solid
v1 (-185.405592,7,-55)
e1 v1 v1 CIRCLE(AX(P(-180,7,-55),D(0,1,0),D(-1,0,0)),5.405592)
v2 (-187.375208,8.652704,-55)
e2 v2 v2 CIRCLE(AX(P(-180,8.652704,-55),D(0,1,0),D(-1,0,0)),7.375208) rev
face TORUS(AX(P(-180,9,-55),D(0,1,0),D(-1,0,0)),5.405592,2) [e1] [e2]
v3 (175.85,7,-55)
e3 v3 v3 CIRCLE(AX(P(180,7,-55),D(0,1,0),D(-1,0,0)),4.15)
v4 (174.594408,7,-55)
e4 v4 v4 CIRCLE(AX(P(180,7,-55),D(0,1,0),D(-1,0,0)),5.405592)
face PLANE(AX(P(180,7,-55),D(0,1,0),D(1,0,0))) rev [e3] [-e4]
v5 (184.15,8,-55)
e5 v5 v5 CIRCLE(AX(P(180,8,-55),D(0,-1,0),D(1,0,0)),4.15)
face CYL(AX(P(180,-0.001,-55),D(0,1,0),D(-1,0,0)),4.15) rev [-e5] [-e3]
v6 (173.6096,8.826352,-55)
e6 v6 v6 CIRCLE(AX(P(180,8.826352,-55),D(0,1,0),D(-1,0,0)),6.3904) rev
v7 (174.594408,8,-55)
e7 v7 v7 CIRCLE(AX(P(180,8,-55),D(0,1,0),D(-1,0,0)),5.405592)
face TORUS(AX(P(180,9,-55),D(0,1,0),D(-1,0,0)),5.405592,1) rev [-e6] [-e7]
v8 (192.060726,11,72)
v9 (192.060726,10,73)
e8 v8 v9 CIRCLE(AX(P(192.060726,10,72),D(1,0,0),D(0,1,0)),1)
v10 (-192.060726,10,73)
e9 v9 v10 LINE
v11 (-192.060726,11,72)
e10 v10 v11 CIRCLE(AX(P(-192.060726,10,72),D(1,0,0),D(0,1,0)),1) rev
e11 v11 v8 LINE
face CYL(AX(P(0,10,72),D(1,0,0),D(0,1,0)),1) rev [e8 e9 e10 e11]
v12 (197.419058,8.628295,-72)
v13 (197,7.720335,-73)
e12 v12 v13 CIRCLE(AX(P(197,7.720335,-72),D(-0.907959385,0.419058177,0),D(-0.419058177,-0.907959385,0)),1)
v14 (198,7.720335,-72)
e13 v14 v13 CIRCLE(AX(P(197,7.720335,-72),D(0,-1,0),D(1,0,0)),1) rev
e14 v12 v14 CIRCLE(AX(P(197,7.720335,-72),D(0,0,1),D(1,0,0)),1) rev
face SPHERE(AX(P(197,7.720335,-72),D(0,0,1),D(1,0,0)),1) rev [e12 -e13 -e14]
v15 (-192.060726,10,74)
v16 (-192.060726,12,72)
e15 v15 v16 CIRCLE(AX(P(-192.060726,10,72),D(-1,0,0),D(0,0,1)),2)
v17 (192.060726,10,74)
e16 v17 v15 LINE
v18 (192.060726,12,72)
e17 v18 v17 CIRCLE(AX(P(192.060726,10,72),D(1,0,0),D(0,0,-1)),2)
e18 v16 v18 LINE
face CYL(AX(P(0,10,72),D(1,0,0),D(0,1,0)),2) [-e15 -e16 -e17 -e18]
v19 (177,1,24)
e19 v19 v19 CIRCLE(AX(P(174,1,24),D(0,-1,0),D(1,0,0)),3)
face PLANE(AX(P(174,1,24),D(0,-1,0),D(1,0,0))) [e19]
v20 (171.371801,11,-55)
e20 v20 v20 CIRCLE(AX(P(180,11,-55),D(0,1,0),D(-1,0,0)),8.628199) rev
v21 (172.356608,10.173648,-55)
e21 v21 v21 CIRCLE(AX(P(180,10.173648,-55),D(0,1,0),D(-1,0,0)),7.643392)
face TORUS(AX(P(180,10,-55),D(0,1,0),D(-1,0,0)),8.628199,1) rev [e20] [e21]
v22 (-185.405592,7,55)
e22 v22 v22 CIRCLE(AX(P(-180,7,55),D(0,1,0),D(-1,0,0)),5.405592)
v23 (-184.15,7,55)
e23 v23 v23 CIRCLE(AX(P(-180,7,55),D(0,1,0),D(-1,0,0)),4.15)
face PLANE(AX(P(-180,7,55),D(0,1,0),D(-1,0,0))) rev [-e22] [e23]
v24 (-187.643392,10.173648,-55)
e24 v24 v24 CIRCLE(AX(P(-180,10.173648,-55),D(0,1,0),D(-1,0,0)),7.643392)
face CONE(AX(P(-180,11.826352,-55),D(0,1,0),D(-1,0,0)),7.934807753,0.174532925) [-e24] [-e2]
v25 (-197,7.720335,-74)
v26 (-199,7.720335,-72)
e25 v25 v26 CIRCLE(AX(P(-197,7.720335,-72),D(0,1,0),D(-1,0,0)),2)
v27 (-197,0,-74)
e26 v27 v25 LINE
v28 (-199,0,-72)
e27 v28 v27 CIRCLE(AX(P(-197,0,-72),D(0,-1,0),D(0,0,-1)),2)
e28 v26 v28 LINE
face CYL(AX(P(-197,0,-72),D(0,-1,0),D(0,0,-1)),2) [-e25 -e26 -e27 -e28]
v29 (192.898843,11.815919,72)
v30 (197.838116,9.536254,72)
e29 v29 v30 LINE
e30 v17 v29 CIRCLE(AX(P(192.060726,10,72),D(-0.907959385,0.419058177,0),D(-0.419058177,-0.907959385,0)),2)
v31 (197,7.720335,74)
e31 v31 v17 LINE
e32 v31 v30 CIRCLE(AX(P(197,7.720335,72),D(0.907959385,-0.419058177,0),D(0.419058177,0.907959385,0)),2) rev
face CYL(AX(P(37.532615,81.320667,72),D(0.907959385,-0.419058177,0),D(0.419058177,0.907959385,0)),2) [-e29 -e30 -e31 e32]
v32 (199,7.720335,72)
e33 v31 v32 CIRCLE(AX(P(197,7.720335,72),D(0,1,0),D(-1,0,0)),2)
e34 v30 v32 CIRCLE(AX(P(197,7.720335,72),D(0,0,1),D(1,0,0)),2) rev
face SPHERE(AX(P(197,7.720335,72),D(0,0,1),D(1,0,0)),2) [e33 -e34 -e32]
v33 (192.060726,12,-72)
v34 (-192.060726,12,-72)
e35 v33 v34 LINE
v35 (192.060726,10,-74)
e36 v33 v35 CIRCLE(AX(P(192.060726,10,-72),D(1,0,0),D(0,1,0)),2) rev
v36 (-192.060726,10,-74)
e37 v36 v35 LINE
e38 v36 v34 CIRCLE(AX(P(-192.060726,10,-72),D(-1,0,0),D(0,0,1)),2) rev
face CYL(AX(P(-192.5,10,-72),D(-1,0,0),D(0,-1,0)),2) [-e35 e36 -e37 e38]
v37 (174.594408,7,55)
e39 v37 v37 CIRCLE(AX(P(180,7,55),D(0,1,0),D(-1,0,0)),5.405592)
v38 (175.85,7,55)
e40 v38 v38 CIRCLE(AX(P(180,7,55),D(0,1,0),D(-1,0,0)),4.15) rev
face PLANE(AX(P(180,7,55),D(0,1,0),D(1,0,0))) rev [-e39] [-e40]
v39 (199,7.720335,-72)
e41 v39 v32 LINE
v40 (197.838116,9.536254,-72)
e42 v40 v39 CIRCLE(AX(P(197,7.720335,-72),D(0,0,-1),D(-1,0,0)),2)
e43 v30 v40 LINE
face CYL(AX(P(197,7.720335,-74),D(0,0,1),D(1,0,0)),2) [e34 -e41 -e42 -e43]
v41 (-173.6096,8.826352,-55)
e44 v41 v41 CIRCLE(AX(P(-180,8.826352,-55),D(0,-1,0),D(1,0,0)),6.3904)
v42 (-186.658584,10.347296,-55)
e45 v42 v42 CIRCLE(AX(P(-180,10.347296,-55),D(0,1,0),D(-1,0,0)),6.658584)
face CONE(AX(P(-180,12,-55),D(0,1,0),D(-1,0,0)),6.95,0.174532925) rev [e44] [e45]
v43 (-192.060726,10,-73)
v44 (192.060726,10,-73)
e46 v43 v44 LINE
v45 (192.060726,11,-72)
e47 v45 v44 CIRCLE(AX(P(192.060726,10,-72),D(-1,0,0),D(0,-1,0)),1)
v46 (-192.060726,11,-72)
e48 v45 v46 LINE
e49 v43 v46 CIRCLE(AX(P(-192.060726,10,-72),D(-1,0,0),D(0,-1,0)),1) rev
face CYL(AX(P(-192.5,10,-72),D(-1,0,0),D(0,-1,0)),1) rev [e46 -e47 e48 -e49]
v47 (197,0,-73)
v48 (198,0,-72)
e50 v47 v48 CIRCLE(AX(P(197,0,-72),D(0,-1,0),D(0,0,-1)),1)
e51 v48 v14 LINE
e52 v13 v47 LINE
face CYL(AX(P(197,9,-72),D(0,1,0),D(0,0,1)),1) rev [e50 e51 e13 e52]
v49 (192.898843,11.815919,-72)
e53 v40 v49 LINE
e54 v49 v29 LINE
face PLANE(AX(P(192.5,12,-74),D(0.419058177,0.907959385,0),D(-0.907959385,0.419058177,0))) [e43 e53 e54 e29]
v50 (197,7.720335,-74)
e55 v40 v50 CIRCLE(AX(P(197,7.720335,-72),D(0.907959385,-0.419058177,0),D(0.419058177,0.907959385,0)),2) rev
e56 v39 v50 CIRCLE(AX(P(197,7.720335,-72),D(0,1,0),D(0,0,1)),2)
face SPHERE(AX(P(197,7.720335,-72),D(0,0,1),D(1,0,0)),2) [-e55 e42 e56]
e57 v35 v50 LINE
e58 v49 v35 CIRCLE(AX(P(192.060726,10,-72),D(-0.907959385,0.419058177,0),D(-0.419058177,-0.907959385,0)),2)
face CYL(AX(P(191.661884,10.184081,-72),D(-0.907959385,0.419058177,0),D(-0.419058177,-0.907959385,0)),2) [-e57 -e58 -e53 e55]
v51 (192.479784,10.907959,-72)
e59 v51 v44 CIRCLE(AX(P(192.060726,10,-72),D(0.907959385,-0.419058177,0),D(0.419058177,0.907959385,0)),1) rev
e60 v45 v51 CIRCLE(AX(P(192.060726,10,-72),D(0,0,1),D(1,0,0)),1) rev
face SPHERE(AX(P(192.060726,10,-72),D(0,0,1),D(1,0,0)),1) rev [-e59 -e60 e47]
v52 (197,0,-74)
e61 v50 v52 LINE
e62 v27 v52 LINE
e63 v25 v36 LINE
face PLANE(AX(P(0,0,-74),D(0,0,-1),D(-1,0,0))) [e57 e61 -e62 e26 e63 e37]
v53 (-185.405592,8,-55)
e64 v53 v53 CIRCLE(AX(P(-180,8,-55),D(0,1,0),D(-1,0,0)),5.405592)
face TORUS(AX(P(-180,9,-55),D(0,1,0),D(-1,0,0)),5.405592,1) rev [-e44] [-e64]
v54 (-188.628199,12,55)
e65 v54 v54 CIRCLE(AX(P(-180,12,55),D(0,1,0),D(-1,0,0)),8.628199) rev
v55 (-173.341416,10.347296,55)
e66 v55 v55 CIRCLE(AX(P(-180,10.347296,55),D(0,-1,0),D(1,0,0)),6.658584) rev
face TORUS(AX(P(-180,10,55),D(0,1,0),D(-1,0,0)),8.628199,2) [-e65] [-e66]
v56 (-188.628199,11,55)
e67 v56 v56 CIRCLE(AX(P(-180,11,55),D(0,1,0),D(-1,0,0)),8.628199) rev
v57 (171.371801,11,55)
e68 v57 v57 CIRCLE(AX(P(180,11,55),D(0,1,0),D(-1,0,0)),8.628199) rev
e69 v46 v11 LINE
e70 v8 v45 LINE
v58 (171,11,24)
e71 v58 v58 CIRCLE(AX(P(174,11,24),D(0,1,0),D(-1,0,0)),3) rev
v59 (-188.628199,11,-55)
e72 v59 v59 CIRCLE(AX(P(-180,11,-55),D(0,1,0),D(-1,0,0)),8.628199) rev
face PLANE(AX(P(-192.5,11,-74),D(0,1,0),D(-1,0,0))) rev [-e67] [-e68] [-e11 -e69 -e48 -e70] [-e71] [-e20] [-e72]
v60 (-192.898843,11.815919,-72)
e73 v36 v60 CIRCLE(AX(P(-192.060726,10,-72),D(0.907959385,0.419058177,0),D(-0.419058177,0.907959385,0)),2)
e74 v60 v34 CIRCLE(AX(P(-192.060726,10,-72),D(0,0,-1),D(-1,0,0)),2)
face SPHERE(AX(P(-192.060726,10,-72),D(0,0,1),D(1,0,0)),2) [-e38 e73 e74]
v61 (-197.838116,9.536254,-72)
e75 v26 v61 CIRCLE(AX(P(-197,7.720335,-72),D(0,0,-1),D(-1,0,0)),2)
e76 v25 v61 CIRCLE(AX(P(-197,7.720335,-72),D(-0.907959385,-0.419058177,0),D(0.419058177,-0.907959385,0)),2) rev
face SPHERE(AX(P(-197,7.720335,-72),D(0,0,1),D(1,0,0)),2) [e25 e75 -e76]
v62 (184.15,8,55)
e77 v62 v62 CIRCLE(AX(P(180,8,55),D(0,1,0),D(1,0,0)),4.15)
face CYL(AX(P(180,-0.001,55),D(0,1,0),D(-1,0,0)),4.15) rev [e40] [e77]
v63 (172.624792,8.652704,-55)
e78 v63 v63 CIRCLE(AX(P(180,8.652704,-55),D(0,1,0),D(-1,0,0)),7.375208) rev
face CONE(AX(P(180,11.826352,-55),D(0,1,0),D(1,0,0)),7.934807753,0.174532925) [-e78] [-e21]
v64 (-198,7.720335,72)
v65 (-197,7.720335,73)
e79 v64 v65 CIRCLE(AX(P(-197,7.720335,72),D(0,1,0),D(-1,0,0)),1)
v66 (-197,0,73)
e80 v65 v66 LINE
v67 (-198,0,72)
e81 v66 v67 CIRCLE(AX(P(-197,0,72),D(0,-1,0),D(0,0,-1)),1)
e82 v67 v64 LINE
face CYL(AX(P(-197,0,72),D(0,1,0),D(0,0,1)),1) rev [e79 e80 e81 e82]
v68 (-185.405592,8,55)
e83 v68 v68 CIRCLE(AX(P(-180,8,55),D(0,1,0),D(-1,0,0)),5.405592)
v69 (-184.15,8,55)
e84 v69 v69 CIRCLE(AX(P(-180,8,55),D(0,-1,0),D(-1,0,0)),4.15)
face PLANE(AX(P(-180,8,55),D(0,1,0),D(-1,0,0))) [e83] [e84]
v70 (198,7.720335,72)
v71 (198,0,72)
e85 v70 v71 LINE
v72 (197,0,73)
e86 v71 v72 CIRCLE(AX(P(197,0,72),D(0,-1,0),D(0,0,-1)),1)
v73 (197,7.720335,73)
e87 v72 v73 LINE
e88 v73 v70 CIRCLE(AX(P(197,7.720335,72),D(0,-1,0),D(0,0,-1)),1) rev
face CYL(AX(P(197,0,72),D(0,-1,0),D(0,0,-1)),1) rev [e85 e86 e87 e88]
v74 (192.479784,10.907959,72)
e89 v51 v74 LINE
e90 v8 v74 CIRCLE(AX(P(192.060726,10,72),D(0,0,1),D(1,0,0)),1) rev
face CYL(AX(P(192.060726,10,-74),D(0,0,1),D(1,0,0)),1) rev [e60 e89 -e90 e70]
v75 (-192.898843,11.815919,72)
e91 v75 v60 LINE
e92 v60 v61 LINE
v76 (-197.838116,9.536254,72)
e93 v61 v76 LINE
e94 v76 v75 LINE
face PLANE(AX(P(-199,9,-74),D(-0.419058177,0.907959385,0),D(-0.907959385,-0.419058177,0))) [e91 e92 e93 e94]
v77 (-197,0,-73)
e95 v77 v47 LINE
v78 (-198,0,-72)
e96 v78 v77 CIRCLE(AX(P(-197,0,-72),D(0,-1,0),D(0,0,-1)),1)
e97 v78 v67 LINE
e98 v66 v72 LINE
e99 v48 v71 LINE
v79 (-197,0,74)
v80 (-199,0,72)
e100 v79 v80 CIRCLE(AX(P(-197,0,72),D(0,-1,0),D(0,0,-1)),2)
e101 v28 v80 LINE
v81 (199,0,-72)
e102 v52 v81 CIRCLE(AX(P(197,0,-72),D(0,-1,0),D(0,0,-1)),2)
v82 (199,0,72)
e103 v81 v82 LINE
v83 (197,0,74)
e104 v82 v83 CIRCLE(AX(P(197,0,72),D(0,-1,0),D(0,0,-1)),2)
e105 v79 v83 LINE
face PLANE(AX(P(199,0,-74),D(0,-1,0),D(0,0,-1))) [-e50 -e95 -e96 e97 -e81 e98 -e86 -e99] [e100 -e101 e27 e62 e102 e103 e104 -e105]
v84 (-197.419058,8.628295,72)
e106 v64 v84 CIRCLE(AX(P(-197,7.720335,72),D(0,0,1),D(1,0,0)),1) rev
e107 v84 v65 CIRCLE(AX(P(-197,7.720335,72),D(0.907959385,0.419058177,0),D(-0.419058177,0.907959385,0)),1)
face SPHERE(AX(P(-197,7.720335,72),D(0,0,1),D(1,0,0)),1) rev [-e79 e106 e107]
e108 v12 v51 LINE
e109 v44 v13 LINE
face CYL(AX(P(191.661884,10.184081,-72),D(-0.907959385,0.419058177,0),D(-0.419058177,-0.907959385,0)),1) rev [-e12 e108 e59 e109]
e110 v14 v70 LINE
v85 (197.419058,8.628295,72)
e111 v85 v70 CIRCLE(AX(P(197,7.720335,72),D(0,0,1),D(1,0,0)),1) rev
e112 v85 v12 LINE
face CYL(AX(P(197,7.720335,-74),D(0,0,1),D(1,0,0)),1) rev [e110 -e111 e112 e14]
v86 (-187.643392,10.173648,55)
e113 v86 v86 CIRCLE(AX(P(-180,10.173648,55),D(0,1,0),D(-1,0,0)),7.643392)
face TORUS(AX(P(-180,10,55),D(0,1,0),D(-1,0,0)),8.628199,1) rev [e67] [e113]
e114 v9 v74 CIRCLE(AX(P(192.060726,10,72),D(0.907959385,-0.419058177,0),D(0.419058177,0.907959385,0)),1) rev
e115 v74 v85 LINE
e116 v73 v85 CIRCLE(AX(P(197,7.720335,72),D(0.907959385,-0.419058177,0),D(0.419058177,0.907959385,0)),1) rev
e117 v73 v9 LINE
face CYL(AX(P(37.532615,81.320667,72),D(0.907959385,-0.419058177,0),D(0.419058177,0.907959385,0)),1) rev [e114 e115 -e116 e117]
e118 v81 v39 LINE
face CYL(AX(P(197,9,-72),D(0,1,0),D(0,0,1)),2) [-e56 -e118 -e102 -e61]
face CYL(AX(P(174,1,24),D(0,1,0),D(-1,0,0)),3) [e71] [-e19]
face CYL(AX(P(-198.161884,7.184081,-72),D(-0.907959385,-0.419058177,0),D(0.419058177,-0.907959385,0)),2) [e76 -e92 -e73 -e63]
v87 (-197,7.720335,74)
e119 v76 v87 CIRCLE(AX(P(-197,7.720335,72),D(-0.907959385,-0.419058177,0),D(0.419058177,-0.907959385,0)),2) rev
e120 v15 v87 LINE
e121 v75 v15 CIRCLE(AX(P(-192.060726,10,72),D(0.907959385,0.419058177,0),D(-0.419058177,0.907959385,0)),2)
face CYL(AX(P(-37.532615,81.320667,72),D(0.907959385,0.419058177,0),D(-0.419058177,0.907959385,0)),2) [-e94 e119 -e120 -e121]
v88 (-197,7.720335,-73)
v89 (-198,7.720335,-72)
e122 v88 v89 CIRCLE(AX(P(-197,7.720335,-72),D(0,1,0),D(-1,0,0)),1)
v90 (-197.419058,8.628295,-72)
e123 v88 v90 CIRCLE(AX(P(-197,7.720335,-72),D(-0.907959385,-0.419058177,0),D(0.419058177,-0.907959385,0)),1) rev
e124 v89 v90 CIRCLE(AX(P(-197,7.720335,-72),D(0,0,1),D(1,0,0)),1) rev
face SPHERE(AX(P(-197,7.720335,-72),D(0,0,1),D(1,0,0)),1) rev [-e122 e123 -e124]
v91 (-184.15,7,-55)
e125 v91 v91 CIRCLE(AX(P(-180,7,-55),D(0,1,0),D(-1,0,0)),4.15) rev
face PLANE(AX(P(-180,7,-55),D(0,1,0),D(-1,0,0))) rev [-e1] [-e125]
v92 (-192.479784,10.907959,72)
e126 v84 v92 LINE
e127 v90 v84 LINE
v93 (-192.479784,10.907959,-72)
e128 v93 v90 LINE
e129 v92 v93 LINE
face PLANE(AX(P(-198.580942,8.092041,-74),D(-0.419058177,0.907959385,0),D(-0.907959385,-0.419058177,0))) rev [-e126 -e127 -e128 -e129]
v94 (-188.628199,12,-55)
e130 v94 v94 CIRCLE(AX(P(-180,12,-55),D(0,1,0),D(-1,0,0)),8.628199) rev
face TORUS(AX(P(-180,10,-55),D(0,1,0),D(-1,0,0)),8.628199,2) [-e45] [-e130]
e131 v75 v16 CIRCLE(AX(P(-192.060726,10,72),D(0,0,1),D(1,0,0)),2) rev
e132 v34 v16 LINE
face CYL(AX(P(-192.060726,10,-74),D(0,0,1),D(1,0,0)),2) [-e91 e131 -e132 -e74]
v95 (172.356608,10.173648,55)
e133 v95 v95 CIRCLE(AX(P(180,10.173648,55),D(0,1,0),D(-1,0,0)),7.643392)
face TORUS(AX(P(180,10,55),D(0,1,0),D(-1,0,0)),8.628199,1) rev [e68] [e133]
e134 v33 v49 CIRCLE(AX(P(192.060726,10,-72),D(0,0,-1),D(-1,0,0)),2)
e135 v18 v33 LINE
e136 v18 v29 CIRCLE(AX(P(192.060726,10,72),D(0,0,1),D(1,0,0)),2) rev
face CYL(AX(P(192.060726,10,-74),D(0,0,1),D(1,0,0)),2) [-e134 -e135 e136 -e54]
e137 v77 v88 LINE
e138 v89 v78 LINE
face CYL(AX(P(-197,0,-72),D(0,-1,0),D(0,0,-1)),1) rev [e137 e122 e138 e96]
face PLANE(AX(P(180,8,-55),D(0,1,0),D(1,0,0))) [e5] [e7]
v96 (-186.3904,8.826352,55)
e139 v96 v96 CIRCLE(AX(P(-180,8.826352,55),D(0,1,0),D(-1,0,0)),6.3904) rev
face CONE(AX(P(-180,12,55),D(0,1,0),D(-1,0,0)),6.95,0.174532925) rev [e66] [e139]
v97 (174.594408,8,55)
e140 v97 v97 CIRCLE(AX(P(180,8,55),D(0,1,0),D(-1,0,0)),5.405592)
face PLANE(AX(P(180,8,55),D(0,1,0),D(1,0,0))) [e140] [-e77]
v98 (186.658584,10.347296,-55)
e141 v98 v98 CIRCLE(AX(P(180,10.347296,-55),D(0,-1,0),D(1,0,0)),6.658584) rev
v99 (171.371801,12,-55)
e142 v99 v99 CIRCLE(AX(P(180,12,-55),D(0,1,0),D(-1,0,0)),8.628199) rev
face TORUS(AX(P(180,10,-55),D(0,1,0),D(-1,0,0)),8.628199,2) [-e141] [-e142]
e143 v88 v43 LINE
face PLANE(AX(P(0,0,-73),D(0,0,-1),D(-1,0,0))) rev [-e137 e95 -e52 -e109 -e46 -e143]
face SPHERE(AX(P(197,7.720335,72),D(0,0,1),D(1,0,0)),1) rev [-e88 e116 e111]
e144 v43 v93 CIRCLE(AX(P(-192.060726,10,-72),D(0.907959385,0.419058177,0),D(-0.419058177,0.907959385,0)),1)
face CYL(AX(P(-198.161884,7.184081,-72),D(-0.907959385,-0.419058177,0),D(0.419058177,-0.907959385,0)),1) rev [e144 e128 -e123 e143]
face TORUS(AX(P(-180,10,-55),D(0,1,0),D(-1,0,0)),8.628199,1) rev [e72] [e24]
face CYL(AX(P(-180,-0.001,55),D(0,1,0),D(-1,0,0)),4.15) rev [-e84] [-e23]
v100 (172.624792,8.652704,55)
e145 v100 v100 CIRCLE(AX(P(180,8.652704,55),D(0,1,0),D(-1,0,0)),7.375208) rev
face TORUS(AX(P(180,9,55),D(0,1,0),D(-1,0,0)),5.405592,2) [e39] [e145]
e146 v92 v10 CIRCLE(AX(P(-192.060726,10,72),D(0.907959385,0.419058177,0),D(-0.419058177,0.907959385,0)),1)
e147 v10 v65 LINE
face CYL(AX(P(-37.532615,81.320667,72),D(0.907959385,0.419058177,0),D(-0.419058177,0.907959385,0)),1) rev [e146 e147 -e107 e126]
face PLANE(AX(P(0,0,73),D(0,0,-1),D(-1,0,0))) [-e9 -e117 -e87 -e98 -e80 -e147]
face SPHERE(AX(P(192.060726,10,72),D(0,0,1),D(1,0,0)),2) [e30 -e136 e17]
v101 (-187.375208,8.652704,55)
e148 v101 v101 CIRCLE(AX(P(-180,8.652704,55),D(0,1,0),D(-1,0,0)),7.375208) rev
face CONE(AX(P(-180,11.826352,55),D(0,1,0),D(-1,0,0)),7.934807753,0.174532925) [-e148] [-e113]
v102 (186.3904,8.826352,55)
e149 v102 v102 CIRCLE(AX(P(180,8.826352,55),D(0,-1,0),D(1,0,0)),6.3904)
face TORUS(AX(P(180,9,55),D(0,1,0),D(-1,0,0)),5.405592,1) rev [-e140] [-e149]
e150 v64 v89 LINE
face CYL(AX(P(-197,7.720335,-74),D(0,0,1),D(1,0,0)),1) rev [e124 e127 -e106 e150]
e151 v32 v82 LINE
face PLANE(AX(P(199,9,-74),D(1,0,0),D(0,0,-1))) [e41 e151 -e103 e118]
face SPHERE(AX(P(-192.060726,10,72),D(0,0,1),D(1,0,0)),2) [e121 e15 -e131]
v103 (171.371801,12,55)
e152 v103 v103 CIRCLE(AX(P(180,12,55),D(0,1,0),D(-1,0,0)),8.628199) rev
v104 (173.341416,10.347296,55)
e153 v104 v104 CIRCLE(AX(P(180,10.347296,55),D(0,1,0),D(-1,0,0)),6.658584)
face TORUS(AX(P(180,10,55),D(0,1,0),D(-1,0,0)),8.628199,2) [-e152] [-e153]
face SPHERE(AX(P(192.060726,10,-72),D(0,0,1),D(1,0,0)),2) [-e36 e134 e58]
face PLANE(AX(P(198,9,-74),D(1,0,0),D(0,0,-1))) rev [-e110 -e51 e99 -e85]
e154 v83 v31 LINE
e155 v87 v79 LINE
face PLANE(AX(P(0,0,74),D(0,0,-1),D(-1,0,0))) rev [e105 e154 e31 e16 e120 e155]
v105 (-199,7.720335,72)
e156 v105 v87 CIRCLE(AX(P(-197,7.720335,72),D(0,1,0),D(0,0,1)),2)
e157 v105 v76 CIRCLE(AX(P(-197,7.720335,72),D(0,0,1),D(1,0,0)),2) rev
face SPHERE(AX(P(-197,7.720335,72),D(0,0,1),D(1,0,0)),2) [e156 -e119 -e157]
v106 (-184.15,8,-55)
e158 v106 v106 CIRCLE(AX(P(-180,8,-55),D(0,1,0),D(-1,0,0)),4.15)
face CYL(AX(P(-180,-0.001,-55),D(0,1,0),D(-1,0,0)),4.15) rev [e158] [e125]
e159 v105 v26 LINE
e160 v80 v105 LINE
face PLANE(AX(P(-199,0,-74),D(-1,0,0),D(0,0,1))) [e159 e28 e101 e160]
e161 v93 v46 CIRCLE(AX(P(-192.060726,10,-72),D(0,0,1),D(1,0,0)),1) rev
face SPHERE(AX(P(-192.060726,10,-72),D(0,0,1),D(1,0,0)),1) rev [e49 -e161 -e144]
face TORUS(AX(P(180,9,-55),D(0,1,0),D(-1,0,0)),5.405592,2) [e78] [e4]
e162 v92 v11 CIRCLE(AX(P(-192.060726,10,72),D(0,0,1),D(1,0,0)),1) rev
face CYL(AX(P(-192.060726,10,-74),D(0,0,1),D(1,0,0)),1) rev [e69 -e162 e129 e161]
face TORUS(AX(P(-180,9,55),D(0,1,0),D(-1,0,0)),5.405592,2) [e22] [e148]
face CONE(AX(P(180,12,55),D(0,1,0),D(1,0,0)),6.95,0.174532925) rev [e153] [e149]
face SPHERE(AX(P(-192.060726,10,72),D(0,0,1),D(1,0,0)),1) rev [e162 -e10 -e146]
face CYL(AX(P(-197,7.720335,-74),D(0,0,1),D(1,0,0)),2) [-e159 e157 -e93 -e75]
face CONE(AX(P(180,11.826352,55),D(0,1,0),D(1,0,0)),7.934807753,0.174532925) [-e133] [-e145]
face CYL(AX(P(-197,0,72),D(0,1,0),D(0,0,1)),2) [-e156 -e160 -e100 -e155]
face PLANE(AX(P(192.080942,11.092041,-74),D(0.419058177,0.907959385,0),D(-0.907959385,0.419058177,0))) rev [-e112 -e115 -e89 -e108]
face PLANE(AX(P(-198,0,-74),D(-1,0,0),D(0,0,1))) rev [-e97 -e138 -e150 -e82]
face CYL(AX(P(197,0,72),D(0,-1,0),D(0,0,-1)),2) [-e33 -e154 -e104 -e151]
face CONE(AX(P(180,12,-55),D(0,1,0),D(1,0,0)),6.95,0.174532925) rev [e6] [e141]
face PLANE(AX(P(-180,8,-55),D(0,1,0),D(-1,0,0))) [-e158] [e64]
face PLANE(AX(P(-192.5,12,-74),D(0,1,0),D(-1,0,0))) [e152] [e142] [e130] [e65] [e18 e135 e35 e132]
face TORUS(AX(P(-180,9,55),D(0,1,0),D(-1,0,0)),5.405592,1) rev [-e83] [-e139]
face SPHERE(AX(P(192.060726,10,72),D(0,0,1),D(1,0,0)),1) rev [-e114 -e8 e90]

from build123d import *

# Parameters (mm, degrees)
BOSS_EXTRUDE1_DEPTH       = 74
BOSS_EXTRUDE1_DEPTH_BACK  = 74
SKETCH2_R                 = 6.95
CUT_EXTRUDE1_DEPTH        = 4
DRAFT1_ANGLE              = 10
FILLET2_R                 = 1
DRAFT1_OF_MIRROR1_2_ANGLE = 10
FILLET2_OF_MIRROR1_R      = 1
FILLET1_R                 = 2
SHELL1_T                  = -1
CUT_EXTRUDE2_REACH        = 214.464
SKETCH3_R                 = 4.15
MIRROR4_COPY_1_REACH      = 214.464
MIRROR4_COPY_1_SKETCH_R   = 4.15
SKETCH4_R                 = 3
BOSS_EXTRUDE2_DEPTH       = 10


# Read off the part's stored shape, not the designer's step: Mirror2
with BuildPart() as part:
    # Sketch1 → Boss-Extrude1 (new, two sides: drawn at the far end of the back side and taken through both)
    with BuildSketch(Plane.XY.offset(-BOSS_EXTRUDE1_DEPTH_BACK)):
        Polygon((-199, 0), (-199, 9), (-192.5, 12), (192.5, 12), (199, 9), (199, 0), align=None)
    extrude(amount=BOSS_EXTRUDE1_DEPTH + BOSS_EXTRUDE1_DEPTH_BACK)

    # Sketch2 → Cut-Extrude1 (cut)
    with BuildSketch(Plane(origin=(0, 12, 0), x_dir=(1, 0, 0), z_dir=(0, 1, 0))):
        with Locations(Location((-180, 55, 0), (0, 0, 180))):
            Circle(SKETCH2_R)
    cut_extrude1 = extrude(amount=-CUT_EXTRUDE1_DEPTH, mode=Mode.SUBTRACT)

    # Draft1
    draft1_faces = [part.faces().sort_by_distance(p)[0] for p in [
        (-173.05, 10, -55),
    ]]
    draft(draft1_faces, Plane(origin=(-192.5, 12, -74), x_dir=(1, 0, 0), z_dir=(0, 1, 0)), DRAFT1_ANGLE)

    # Fillet2
    fillet2_edges = [part.edges().sort_by_distance(p)[0] for p in [
        (-173.755307923, 8, -55),
    ]]
    fillet(fillet2_edges, radius=FILLET2_R)

    # Mirror1: Cut-Extrude1 across plane
    add(cut_extrude1.mirror(Plane(origin=(0, 0, 0), x_dir=(0, 0, 1), z_dir=(1, 0, 0))), mode=Mode.SUBTRACT)

    # Draft1 of Mirror1 2
    draft1_of_mirror1_2_faces = [part.faces().sort_by_distance(p)[0] for p in [
        (173.05, 10, -55),
    ]]
    draft(draft1_of_mirror1_2_faces, Plane(origin=(192.5, 12, -74), x_dir=(-1, 0, 0), z_dir=(0, 1, 0)), DRAFT1_OF_MIRROR1_2_ANGLE)

    # Fillet2 of Mirror1
    fillet2_of_mirror1_edges = [part.edges().sort_by_distance(p)[0] for p in [
        (173.755307923, 8, -55),
    ]]
    fillet(fillet2_of_mirror1_edges, radius=FILLET2_OF_MIRROR1_R)

    # Mirror2 outline → Mirror2 (revolve, cut)
    with BuildSketch(Plane(origin=(180, 0, 55), x_dir=(1, 0, 0), z_dir=(0, 0, 1))):
        with BuildLine():
            Line((0, 12), (0, 8))
            Line((0, 8), (5.405592446, 8))
            ThreePointArc((5.405592446, 8), (6.048380056, 8.233955557), (6.390400199, 8.826351822))
            Line((6.390400199, 8.826351822), (6.95, 12))
            Line((6.95, 12), (0, 12))
        make_face()
    revolve(axis=Axis((180, 0, 55), (0, 1, 0)), mode=Mode.SUBTRACT)

    # Mirror2 2 outline → Mirror2 2 (revolve, cut)
    with BuildSketch(Plane(origin=(-180, 0, 55), x_dir=(1, 0, 0), z_dir=(0, 0, 1))):
        with BuildLine():
            Line((0, 12), (0, 8))
            Line((0, 8), (5.405592446, 8))
            ThreePointArc((5.405592446, 8), (6.048380056, 8.233955557), (6.390400199, 8.826351822))
            Line((6.390400199, 8.826351822), (6.95, 12))
            Line((6.95, 12), (0, 12))
        make_face()
    revolve(axis=Axis((-180, 0, 55), (0, 1, 0)), mode=Mode.SUBTRACT)

    # Fillet1
    fillet1_edges = [part.edges().sort_by_distance(p)[0] for p in [
        (195.75, 10.5, -74),
        (-199, 9, 0),
        (-192.5, 12, 0),
        (192.5, 12, 0),
        (199, 9, 0),
        (0, 12, -74),
        (-195.75, 10.5, -74),
        (199, 4.5, 74),
        (195.75, 10.5, 74),
        (0, 12, 74),
        (-195.75, 10.5, 74),
        (-199, 4.5, -74),
        (-199, 4.5, 74),
        (-173.05, 12, -55),
        (173.05, 12, -55),
        (173.05, 12, 55),
        (-186.95, 12, 55),
        (199, 4.5, -74),
    ]]
    fillet(fillet1_edges, radius=FILLET1_R)

    # Shell1
    shell1_openings = [part.faces().sort_by_distance(p)[0] for p in [
        (0, 0, 0),
    ]]
    offset(amount=SHELL1_T, openings=shell1_openings, kind=Kind.INTERSECTION)

    # Sketch3 → Cut-Extrude2 (cut, up to next)
    with BuildSketch(Plane(origin=(0, 8, 0), x_dir=(1, 0, 0), z_dir=(0, 1, 0)), mode=Mode.PRIVATE) as cut_extrude2_sk1:
        with Locations(Location((-180, 55, 0), (0, 0, 180))):
            Circle(SKETCH3_R)
    cut_extrude2_tool1 = extrude(cut_extrude2_sk1.sketch, amount=-CUT_EXTRUDE2_REACH, mode=Mode.PRIVATE) & part.part
    cut_extrude2 = cut_extrude2_tool1.solids().sort_by_distance((-180, 8, -55))[0]
    add(cut_extrude2, mode=Mode.SUBTRACT)

    # Mirror3: Cut-Extrude2 across plane
    add(cut_extrude2.mirror(Plane.XY), mode=Mode.SUBTRACT)

    # Mirror4: Cut-Extrude2 across plane
    add(cut_extrude2.mirror(Plane(origin=(0, 0, 0), x_dir=(0, 0, 1), z_dir=(1, 0, 0))), mode=Mode.SUBTRACT)

    # Mirror4 copy 1 sketch → Mirror4 copy 1 (cut, up to next)
    with BuildSketch(Plane(origin=(0, 8, 0), x_dir=(-1, 0, 0), z_dir=(0, 1, 0)), mode=Mode.PRIVATE) as mirror4_copy_1_sk1:
        with Locations(Location((-180, 55, 0), (0, 0, 180))):
            Circle(MIRROR4_COPY_1_SKETCH_R)
    mirror4_copy_1_tool1 = extrude(mirror4_copy_1_sk1.sketch, amount=-MIRROR4_COPY_1_REACH, mode=Mode.PRIVATE) & part.part
    add(mirror4_copy_1_tool1.solids().sort_by_distance((180, 8, 55))[0], mode=Mode.SUBTRACT)

    # Sketch4 → Boss-Extrude2 (add)
    with BuildSketch(Plane.XZ.offset(-11)):
        with Locations(Location((174, 24, 0), (0, 0, 180))):
            Circle(SKETCH4_R)
    extrude(amount=BOSS_EXTRUDE2_DEPTH)


solid = part.part
